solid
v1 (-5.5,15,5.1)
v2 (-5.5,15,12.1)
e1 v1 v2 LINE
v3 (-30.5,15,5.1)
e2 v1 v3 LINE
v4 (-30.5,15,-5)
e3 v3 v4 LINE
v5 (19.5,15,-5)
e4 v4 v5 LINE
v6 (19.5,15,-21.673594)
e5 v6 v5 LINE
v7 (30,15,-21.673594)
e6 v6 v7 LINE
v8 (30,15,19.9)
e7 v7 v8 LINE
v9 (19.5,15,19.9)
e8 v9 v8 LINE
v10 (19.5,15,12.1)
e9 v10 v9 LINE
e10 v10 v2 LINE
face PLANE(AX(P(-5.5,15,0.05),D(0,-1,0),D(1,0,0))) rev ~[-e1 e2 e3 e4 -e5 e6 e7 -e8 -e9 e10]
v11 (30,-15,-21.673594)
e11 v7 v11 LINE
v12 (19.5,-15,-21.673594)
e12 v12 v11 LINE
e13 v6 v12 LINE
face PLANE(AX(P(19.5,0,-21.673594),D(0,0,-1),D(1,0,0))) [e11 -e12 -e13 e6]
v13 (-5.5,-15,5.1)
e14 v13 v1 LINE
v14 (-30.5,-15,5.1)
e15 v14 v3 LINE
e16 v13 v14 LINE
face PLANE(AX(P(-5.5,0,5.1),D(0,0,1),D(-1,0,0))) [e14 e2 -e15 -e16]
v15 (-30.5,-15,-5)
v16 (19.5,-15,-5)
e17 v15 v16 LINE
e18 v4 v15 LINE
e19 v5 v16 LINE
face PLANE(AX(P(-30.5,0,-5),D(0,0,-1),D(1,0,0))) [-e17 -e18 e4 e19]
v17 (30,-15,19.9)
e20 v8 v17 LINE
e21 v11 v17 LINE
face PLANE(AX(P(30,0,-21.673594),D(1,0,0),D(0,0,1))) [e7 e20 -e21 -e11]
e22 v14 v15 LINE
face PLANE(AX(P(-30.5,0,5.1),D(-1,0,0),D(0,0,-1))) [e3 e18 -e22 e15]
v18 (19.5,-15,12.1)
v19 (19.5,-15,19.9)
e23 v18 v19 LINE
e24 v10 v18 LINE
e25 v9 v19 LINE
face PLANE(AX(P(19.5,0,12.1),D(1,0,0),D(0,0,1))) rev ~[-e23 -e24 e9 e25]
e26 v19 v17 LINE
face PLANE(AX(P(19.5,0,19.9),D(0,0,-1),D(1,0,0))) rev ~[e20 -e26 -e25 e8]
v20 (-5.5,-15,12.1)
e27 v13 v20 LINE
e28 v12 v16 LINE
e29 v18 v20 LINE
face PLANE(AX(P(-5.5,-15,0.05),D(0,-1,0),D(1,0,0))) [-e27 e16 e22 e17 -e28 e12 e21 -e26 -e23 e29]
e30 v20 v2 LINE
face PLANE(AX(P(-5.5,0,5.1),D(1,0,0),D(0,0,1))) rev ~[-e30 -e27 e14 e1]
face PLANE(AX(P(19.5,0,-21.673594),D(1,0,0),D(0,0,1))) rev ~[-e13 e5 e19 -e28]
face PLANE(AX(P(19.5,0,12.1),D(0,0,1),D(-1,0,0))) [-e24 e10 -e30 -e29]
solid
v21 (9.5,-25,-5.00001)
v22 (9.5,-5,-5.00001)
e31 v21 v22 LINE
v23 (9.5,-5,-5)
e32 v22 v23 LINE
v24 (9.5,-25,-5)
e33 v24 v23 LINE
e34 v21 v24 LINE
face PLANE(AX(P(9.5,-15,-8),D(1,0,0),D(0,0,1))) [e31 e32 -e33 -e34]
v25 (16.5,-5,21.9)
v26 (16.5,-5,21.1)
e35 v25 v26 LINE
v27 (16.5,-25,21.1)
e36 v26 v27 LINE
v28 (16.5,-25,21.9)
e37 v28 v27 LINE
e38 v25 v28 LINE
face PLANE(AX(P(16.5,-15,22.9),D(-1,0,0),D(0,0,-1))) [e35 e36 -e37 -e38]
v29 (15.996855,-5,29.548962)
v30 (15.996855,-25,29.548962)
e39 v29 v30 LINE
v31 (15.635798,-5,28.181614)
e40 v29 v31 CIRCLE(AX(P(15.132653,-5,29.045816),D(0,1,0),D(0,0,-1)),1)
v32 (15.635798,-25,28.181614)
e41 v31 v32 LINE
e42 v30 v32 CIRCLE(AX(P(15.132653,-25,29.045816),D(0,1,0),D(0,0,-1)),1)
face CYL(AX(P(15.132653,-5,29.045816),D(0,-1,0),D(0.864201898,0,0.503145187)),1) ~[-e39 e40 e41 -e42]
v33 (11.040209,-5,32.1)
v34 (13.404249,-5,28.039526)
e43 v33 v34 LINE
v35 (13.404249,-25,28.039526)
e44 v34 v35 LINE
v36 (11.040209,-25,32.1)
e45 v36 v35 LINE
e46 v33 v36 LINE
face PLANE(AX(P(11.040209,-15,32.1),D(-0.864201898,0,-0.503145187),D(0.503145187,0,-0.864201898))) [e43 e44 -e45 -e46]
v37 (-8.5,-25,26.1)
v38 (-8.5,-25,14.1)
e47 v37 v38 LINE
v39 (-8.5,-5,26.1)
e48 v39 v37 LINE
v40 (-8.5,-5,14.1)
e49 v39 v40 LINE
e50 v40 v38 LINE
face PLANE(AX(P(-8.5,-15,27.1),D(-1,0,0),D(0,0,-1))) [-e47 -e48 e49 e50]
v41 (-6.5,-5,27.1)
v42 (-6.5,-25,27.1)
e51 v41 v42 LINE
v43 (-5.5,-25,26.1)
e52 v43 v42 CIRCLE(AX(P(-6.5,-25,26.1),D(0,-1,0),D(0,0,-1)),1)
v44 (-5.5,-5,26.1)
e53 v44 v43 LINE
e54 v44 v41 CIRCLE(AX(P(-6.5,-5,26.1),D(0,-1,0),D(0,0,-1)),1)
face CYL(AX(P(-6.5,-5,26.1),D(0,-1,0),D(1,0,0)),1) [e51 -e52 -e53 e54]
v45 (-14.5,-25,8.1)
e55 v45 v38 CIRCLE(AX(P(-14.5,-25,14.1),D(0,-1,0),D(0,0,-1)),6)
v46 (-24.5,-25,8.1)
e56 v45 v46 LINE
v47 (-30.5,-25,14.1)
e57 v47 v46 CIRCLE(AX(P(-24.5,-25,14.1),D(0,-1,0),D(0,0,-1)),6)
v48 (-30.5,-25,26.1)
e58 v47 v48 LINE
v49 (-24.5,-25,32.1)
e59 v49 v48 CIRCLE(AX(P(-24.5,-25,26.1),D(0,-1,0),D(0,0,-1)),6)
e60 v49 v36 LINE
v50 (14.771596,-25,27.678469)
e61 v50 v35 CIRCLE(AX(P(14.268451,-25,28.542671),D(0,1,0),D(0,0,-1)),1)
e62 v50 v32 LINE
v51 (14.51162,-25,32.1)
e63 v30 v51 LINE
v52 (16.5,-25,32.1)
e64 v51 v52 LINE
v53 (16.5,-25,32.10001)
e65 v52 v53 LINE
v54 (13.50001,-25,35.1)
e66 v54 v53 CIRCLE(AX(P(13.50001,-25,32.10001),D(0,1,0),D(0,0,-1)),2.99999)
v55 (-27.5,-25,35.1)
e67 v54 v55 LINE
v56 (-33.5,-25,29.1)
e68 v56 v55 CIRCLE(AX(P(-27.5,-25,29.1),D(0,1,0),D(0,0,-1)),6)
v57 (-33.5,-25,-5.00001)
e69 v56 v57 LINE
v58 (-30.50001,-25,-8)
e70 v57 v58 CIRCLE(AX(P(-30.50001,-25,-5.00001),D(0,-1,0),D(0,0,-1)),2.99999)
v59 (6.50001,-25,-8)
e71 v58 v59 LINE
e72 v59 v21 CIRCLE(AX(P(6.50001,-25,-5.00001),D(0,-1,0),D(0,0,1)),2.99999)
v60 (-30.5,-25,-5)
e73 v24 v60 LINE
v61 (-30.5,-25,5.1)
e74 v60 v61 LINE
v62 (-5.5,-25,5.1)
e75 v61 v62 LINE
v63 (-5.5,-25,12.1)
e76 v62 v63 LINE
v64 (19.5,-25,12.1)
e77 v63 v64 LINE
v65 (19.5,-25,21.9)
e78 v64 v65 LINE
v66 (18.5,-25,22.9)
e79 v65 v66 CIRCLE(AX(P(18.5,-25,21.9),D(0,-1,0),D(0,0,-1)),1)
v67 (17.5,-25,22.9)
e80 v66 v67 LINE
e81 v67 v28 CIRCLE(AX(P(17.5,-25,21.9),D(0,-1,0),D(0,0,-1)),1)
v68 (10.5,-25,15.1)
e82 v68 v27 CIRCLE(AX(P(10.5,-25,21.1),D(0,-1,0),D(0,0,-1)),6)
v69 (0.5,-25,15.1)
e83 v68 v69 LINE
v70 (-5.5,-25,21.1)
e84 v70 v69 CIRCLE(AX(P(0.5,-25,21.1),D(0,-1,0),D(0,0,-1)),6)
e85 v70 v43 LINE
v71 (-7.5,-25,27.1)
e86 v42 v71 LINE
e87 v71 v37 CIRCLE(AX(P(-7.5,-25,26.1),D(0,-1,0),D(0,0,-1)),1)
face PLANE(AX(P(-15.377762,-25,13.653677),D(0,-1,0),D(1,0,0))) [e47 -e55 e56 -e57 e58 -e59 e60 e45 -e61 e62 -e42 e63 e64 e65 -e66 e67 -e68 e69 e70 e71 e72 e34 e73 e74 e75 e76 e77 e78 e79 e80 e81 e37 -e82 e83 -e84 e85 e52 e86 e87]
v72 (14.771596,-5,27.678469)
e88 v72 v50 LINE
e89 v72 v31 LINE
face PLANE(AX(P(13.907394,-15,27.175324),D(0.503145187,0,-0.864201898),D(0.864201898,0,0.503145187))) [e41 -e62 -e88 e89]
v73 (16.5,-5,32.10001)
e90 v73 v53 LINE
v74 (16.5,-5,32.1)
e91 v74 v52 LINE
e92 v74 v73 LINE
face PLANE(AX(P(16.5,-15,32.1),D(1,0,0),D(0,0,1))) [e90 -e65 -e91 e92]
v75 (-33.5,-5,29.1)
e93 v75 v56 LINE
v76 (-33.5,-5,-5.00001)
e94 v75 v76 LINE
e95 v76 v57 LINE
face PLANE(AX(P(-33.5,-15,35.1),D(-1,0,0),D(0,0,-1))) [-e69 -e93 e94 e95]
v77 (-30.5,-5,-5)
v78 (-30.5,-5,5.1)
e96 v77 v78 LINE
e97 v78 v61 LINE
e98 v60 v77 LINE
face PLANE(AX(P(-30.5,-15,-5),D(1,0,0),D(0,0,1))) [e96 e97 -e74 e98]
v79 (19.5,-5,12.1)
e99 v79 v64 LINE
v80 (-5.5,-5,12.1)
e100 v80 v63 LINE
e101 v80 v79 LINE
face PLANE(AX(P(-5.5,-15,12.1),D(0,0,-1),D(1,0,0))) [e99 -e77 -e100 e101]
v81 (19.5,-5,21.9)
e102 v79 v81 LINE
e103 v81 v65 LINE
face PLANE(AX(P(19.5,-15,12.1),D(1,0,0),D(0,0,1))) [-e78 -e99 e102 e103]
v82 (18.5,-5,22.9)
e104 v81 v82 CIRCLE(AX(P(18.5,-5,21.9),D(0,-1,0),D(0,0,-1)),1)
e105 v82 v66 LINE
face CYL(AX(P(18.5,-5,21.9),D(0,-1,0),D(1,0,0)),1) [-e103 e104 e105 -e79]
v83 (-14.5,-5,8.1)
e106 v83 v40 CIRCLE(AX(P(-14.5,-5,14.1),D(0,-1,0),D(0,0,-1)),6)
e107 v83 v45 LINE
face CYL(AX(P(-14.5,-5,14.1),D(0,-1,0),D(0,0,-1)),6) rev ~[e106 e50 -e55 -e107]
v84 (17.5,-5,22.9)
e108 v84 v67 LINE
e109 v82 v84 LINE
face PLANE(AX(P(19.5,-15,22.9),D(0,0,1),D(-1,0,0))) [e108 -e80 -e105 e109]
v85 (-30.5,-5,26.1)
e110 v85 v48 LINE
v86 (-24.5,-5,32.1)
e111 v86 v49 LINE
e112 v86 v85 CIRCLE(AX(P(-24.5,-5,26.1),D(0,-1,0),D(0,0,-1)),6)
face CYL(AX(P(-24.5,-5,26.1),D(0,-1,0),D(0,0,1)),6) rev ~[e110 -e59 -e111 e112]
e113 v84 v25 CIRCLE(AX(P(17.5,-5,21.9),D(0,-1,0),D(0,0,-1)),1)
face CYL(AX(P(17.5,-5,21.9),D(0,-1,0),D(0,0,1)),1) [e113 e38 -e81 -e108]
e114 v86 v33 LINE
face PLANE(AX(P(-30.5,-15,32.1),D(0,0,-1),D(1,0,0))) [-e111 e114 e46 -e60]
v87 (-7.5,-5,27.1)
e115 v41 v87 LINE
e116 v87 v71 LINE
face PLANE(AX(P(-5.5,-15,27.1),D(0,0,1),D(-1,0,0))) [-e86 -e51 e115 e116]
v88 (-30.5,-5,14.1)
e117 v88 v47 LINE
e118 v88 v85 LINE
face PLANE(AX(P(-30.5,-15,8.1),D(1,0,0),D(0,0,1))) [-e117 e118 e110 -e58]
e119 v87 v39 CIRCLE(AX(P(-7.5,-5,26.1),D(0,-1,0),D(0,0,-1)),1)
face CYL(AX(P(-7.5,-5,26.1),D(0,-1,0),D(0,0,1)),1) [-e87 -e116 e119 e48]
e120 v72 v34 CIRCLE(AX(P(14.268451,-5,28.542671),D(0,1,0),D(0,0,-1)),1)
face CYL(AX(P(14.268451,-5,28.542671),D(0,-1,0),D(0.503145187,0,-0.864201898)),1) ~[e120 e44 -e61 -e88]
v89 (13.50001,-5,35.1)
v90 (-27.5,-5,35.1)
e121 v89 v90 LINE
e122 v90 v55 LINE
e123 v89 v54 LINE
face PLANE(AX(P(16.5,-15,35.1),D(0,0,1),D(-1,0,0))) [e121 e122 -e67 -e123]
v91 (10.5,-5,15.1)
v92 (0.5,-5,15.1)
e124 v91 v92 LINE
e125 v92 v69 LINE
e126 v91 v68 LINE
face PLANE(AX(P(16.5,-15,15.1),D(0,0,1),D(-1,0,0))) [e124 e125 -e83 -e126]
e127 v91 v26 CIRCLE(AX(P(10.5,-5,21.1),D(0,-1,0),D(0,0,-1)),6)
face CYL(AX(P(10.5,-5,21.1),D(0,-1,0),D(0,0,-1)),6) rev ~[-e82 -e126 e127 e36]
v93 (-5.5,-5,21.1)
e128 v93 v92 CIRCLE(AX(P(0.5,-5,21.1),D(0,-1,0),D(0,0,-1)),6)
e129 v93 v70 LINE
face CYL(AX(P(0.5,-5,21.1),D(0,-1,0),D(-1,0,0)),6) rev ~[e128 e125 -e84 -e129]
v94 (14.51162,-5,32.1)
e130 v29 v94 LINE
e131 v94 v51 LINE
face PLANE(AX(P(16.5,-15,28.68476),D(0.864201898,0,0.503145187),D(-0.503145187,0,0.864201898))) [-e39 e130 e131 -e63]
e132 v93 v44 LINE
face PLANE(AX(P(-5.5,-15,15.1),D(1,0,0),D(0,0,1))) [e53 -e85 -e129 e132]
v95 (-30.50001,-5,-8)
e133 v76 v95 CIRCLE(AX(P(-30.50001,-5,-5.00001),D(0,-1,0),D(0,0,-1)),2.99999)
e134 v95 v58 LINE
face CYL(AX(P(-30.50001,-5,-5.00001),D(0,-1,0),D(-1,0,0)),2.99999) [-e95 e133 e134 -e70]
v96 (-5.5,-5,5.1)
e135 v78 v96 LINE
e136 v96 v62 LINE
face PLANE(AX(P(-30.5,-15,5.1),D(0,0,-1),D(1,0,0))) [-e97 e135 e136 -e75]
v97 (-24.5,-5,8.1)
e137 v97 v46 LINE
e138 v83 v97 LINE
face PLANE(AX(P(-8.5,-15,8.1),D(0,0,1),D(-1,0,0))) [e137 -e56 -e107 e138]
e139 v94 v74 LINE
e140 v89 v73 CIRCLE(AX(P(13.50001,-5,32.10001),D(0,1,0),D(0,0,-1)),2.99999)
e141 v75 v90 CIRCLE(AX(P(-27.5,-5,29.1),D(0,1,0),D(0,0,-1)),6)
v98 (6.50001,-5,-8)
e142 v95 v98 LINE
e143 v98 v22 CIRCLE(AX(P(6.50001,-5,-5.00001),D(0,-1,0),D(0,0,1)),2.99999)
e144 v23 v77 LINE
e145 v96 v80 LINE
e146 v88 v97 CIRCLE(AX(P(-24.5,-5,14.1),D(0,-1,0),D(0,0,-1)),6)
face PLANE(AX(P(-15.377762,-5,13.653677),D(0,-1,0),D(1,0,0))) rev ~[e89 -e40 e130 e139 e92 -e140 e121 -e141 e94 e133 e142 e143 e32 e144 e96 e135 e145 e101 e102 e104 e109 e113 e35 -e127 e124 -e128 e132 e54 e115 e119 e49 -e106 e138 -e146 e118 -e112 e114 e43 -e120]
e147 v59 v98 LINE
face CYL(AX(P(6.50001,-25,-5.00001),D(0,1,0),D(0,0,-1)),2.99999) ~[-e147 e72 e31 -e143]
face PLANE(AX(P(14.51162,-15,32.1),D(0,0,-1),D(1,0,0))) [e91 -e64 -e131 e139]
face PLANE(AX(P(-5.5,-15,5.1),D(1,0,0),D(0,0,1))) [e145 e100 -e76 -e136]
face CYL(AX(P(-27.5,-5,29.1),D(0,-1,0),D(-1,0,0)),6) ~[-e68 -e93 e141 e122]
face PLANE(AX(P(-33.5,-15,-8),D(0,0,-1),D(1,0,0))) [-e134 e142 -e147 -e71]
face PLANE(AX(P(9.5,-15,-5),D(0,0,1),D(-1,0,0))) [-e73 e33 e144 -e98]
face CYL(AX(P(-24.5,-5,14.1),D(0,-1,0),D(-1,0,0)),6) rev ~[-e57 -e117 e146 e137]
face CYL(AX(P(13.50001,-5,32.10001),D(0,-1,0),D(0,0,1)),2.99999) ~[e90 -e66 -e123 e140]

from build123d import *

# Parameters (mm, degrees)
F0_W          = 25
F0_H          = 7
F0_W_2        = 10.5
F0_H_2        = 10.1
F0_H_3        = 16.6735936701
F0_H_4        = 7.8
F1_DEPTH      = 15
F1_DEPTH_BACK = 15
F3_DEPTH      = 10
F3_DEPTH_BACK = 10
F4_R          = 6
F5_R          = 2.99999
F6_R          = 1


# Not quite as in the source:
# - a fillet or chamfer is up to 0.001 mm smaller than in the source, because OpenCascade refuses the exact size


with BuildPart() as f1:
    # F0 (on Front) → F1 (new body, two sides)
    with BuildSketch(Plane.XZ) as f1_sk:
        Polygon((-5.5, 5.1), (-30.5, 5.1), (-30.5, -5), (19.5, -5), (19.5, 5.1), align=None)
        with Locations((7, 8.6)):
            Rectangle(F0_W, F0_H)
        with Locations((24.75, 8.6)):
            Rectangle(F0_W_2, F0_H)
        with Locations((24.75, 0.05)):
            Rectangle(F0_W_2, F0_H_2)
        with Locations((24.75, -13.3367968351)):
            Rectangle(F0_W_2, F0_H_3)
        with Locations((24.75, 16)):
            Rectangle(F0_W_2, F0_H_4)
    extrude(amount=F1_DEPTH)
    extrude(f1_sk.sketch, amount=-F1_DEPTH_BACK)


with BuildPart() as f3:
    # F2 (on face) → F3 (new body, two sides)
    with BuildSketch(Plane.XZ.offset(15)) as f3_sk:
        Polygon((-30.5, -5), (-30.5, 5.1), (-5.5, 5.1), (-5.5, 12.1), (-5.5, 15.1), (-5.5, 27.1), (-8.5, 27.1), (-8.5, 15.1), (-8.5, 8.1), (-30.5, 8.1), (-30.5, 32.1), (11.0402089751, 32.1), (14.5116200045, 32.1), (12.7649962514, 35.1), (1.8319657538, 35.1), (-33.5, 35.1), (-33.5, 8.1), (-33.5, -5), (-33.5, -8), (9.5, -8), (9.5, -5), align=None)
        Polygon((-5.5, 15.1), (-5.5, 12.1), (19.5, 12.1), (19.5, 19.9), (19.5, 22.9), (16.5, 22.9), (16.5, 15.1), align=None)
        Polygon((16.5, 35.1), (12.7649962514, 35.1), (14.5116200045, 32.1), (16.5, 32.1), align=None)
        Polygon((14.5116200045, 32.1), (11.0402089751, 32.1), (13.9073943063, 27.1753240482), (16.5, 28.6847596105), align=None)
    extrude(amount=F3_DEPTH)
    extrude(f3_sk.sketch, amount=-F3_DEPTH_BACK)

    # F4
    f4_edges = [f3.edges().sort_by_distance(p)[0] for p in [
        (-30.5, -15, 8.1),
        (-30.5, -15, 32.1),
        (-8.5, -15, 8.1),
        (16.5, -15, 15.1),
        (-33.5, -15, 35.1),
        (-5.5, -15, 15.1),
    ]]
    fillet(f4_edges, radius=F4_R)

    # F5 (radius 3 in the source; OpenCascade refuses exactly that, so slightly less here)
    f5_edges = [f3.edges().sort_by_distance(p)[0] for p in [
        (-33.5, -15, -8),
        (9.5, -15, -8),
        (16.5, -15, 35.1),
    ]]
    fillet(f5_edges, radius=F5_R)

    # F6
    f6_edges = [f3.edges().sort_by_distance(p)[0] for p in [
        (13.907394, -15, 27.175324),
        (16.5, -15, 28.68476),
        (-8.5, -15, 27.1),
        (-5.5, -15, 27.1),
        (16.5, -15, 22.9),
        (19.5, -15, 22.9),
    ]]
    fillet(f6_edges, radius=F6_R)


solid = Compound([f1.part, f3.part])
